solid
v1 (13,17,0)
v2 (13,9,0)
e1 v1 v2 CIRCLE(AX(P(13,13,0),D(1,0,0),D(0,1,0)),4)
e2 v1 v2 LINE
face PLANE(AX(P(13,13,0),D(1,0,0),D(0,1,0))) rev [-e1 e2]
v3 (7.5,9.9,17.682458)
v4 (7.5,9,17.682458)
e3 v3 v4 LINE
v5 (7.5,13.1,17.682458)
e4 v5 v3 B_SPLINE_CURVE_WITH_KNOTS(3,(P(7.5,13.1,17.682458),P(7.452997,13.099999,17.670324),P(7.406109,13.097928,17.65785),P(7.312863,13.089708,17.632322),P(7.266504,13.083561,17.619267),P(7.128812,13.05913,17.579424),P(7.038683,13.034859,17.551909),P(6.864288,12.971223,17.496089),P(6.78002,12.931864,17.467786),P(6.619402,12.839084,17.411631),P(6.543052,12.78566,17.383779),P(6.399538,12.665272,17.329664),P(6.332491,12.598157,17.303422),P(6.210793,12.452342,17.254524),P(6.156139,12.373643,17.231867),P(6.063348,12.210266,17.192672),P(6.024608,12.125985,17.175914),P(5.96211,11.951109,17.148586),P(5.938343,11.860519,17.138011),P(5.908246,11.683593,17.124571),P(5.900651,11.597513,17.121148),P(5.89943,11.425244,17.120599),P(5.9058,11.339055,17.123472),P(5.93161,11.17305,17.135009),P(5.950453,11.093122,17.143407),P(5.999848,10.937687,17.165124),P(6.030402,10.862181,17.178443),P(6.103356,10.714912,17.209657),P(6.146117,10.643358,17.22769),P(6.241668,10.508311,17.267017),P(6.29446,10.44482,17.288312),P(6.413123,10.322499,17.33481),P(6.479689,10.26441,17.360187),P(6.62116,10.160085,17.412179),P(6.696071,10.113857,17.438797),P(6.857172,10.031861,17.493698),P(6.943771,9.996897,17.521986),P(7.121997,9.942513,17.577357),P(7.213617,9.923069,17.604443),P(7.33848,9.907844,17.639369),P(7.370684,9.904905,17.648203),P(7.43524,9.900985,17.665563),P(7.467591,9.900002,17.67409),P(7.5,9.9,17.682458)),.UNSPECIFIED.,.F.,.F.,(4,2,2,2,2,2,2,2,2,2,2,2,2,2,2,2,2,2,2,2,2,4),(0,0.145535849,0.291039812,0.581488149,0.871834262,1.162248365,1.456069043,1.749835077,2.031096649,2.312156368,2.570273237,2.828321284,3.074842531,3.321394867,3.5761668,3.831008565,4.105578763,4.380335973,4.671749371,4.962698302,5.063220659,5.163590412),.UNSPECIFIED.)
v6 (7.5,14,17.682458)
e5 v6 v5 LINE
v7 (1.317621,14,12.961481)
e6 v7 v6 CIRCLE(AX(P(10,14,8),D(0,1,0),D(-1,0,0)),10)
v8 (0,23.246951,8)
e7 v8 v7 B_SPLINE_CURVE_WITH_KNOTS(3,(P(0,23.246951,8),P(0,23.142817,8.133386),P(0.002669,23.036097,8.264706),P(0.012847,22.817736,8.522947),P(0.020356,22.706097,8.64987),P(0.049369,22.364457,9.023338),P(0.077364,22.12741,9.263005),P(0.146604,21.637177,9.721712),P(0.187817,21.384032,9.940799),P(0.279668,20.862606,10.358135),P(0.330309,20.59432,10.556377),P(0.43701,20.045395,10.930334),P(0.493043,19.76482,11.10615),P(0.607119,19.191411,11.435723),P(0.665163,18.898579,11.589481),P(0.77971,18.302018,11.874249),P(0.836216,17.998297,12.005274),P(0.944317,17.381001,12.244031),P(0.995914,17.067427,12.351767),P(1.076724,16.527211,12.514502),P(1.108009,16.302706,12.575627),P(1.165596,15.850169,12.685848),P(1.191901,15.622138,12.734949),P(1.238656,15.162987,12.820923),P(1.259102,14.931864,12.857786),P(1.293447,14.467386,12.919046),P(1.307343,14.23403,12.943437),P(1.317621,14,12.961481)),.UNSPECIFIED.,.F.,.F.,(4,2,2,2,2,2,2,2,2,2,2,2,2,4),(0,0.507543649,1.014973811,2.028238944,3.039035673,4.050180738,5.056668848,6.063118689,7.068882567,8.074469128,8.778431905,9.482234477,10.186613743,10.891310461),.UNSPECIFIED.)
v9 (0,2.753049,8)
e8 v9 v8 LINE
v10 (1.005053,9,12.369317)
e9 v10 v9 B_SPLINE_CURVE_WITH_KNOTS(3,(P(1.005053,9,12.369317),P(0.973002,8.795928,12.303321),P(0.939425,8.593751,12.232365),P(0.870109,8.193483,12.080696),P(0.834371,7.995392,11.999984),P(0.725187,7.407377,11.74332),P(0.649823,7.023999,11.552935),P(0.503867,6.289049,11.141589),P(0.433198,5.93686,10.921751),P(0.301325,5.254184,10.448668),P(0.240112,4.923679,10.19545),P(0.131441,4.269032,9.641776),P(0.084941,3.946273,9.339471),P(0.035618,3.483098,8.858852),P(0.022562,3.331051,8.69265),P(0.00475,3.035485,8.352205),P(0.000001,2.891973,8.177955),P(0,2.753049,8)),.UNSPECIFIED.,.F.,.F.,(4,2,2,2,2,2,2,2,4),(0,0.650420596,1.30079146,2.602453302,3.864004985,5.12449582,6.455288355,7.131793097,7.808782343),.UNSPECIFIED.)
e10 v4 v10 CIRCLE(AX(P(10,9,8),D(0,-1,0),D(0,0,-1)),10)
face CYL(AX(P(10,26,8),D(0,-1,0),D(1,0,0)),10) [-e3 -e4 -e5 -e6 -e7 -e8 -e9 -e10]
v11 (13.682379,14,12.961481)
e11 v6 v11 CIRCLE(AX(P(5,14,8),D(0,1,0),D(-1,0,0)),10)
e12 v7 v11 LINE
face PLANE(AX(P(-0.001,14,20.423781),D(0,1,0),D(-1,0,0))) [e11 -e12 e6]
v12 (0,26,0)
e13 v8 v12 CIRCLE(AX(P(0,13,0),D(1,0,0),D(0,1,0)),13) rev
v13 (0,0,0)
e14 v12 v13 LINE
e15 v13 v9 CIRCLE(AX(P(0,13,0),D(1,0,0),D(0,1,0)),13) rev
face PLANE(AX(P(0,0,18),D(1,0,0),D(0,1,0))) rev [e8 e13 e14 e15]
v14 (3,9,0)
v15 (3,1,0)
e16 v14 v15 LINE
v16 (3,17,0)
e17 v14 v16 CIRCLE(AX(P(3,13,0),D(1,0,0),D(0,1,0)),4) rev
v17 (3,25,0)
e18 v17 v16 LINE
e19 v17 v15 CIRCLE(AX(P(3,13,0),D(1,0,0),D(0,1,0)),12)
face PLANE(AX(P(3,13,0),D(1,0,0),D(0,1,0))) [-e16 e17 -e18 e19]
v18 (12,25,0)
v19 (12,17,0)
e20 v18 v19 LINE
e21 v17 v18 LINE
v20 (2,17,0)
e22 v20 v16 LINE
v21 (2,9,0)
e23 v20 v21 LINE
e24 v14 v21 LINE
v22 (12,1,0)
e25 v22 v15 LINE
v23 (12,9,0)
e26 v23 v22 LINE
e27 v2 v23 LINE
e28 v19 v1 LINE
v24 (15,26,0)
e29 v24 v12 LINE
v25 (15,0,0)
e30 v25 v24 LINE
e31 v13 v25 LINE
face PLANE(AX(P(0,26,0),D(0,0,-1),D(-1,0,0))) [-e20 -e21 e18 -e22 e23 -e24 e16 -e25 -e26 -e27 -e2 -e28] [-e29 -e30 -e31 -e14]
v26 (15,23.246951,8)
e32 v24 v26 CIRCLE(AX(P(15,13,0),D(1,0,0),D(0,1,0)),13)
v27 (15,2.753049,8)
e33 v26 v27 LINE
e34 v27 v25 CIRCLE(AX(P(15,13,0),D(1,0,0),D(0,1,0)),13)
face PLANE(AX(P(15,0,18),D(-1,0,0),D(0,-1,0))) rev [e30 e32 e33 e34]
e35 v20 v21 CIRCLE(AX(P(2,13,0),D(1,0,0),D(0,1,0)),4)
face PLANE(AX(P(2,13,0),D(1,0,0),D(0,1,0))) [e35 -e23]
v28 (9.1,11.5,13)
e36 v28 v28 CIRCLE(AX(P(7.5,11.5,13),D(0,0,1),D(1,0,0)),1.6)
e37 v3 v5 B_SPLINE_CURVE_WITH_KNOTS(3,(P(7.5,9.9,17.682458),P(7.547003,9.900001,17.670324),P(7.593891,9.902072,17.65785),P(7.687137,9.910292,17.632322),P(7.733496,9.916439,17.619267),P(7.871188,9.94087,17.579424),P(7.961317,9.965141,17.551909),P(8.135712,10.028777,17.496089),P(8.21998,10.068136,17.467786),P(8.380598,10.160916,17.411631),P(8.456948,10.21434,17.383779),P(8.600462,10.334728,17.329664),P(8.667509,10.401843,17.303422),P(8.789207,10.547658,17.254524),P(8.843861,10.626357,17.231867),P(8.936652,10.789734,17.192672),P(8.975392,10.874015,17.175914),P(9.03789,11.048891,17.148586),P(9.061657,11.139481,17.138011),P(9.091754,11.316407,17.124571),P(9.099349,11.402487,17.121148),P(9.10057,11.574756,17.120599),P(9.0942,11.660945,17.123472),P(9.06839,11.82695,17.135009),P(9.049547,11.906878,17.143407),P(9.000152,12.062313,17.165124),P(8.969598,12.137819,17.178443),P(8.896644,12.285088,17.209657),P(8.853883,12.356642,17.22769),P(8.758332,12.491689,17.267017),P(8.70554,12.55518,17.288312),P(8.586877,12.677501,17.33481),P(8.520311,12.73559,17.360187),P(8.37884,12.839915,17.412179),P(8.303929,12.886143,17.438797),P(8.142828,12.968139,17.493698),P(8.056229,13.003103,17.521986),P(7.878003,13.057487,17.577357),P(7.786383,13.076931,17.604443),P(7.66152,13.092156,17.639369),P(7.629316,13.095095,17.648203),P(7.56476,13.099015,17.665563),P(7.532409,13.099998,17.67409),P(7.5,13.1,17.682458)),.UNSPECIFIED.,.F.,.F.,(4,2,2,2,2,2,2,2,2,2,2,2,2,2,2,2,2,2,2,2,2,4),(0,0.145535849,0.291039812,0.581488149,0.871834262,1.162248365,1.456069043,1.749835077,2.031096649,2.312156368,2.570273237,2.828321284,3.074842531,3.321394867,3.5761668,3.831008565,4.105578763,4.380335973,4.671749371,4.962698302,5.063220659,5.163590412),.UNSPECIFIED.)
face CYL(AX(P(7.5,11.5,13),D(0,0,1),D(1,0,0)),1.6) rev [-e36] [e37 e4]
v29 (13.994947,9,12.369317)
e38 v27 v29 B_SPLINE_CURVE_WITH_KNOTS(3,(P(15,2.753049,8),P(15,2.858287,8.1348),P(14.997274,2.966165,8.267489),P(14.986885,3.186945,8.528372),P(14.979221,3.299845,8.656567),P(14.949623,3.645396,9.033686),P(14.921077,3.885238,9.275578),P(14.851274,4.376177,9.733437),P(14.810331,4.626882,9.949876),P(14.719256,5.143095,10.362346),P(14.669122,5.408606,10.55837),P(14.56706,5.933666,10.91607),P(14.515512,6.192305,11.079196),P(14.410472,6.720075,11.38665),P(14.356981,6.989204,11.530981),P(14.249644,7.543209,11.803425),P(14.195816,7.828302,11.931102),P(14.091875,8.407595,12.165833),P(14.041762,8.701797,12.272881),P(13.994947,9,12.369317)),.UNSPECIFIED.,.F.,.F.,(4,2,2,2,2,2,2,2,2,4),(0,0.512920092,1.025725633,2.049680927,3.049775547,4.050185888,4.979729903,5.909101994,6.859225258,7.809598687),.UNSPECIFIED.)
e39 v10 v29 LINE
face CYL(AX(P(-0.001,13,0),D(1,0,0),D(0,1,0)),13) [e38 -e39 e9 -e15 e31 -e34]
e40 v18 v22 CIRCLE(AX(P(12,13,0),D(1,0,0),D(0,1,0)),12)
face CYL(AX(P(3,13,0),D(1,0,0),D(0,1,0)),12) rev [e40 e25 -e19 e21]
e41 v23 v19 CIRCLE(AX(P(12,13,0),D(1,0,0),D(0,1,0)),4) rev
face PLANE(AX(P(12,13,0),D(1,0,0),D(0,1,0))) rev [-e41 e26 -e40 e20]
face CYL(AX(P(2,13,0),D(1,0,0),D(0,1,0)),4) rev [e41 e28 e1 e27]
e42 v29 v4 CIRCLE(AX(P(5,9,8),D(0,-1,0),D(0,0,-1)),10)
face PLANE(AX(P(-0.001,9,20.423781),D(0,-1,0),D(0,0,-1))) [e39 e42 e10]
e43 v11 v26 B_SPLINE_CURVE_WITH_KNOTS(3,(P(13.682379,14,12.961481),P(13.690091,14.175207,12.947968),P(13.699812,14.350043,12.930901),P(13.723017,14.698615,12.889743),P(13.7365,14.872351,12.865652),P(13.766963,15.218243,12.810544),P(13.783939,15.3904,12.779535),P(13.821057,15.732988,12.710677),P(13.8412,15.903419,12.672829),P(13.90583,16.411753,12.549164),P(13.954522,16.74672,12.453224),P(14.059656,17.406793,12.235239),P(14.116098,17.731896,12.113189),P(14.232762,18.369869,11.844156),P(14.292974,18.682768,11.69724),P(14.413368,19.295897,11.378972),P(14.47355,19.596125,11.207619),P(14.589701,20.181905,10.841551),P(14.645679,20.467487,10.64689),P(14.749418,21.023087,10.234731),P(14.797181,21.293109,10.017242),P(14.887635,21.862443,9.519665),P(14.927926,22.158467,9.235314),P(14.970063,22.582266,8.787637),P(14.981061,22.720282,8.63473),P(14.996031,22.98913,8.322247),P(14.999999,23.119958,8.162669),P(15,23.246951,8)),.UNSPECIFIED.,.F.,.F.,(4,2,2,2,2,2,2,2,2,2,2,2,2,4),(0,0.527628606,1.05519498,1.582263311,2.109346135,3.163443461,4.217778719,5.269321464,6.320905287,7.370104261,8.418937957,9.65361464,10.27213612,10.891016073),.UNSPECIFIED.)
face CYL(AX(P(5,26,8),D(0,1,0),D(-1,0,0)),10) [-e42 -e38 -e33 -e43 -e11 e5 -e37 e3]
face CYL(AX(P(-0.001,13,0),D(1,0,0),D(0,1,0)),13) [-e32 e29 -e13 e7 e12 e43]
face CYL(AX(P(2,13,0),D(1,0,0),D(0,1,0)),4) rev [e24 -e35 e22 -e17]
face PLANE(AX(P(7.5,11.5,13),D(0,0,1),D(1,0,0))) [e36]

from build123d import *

# Parameters (mm, degrees)
SKETCH1_W           = 15
SKETCH1_H           = 26
BOSS_EXTRUDE1_DEPTH = 18
SKETCH2_R           = 4
CUT_EXTRUDE1_DEPTH  = 11
SKETCH3_R           = 12
CUT_EXTRUDE2_DEPTH  = 9
CUT_EXTRUDE3_START  = -15
SKETCH4_W           = 45.765044891
SKETCH4_H           = 35.646606974
CUT_EXTRUDE3_DEPTH  = 15
FILLET1_R           = 10
SKETCH5_R           = 1.6
CUT_EXTRUDE4_DEPTH  = 5


with BuildPart() as part:
    # Sketch1 → Boss-Extrude1 (new body)
    with BuildSketch(Plane.XY):
        with Locations((7.5, 13)):
            Rectangle(SKETCH1_W, SKETCH1_H)
    extrude(amount=BOSS_EXTRUDE1_DEPTH)

    # Sketch2 → Cut-Extrude1 (cut)
    with BuildSketch(Plane(origin=(13, 0, 0), x_dir=(0, 0, -1), z_dir=(1, 0, 0))):
        with Locations((0, 13)):
            Circle(SKETCH2_R)
    extrude(amount=-CUT_EXTRUDE1_DEPTH, mode=Mode.SUBTRACT)

    # Sketch3 → Cut-Extrude2 (cut)
    with BuildSketch(Plane(origin=(12, 0, 0), x_dir=(0, 0, -1), z_dir=(1, 0, 0))):
        with Locations((0, 13)):
            Circle(SKETCH3_R)
    extrude(amount=-CUT_EXTRUDE2_DEPTH, mode=Mode.SUBTRACT)

    # Sketch4 → Cut-Extrude3 (cut)
    with BuildSketch(Plane(origin=(15, 0, 0), x_dir=(0, 0, -1), z_dir=(1, 0, 0)).offset(CUT_EXTRUDE3_START)):
        with Locations((-7.490754188, 14.288489829)):
            Rectangle(SKETCH4_W, SKETCH4_H)
        with BuildLine():
            Line((-20.423780573, 14), (-12.961481397, 14))
            ThreePointArc((-12.961481397, 14), (12.909776733, 14.528942348), (-12.369316877, 9))
            Line((-12.369316877, 9), (-20.423780573, 9))
            Line((-20.423780573, 9), (-20.423780573, 14))
        make_face(mode=Mode.SUBTRACT)
    extrude(amount=CUT_EXTRUDE3_DEPTH, mode=Mode.SUBTRACT)

    # Fillet1
    # the kernel refuses this fillet: 10 mm, written as the material it takes off along each edge
    with BuildSketch(Plane(origin=(15, -16, 18), x_dir=(0, 0, -1), z_dir=(0, 1, 0)), Plane(origin=(0, 39, 18), x_dir=(0, 0, -1), z_dir=(0, -1, 0))) as fillet1_piece_1:
        with BuildLine():
            CenterArc((FILLET1_R, FILLET1_R), FILLET1_R, 180, 90)
            Line((0, FILLET1_R), (0, 0))
            Line((0, 0), (FILLET1_R, 0))
        make_face()
    extrude(amount=55, mode=Mode.SUBTRACT)

    # Sketch5 → Cut-Extrude4 (cut)
    with BuildSketch(Plane.XY.offset(18)):
        with Locations((7.5, 11.5)):
            Circle(SKETCH5_R)
    extrude(amount=-CUT_EXTRUDE4_DEPTH, mode=Mode.SUBTRACT)


solid = part.part
